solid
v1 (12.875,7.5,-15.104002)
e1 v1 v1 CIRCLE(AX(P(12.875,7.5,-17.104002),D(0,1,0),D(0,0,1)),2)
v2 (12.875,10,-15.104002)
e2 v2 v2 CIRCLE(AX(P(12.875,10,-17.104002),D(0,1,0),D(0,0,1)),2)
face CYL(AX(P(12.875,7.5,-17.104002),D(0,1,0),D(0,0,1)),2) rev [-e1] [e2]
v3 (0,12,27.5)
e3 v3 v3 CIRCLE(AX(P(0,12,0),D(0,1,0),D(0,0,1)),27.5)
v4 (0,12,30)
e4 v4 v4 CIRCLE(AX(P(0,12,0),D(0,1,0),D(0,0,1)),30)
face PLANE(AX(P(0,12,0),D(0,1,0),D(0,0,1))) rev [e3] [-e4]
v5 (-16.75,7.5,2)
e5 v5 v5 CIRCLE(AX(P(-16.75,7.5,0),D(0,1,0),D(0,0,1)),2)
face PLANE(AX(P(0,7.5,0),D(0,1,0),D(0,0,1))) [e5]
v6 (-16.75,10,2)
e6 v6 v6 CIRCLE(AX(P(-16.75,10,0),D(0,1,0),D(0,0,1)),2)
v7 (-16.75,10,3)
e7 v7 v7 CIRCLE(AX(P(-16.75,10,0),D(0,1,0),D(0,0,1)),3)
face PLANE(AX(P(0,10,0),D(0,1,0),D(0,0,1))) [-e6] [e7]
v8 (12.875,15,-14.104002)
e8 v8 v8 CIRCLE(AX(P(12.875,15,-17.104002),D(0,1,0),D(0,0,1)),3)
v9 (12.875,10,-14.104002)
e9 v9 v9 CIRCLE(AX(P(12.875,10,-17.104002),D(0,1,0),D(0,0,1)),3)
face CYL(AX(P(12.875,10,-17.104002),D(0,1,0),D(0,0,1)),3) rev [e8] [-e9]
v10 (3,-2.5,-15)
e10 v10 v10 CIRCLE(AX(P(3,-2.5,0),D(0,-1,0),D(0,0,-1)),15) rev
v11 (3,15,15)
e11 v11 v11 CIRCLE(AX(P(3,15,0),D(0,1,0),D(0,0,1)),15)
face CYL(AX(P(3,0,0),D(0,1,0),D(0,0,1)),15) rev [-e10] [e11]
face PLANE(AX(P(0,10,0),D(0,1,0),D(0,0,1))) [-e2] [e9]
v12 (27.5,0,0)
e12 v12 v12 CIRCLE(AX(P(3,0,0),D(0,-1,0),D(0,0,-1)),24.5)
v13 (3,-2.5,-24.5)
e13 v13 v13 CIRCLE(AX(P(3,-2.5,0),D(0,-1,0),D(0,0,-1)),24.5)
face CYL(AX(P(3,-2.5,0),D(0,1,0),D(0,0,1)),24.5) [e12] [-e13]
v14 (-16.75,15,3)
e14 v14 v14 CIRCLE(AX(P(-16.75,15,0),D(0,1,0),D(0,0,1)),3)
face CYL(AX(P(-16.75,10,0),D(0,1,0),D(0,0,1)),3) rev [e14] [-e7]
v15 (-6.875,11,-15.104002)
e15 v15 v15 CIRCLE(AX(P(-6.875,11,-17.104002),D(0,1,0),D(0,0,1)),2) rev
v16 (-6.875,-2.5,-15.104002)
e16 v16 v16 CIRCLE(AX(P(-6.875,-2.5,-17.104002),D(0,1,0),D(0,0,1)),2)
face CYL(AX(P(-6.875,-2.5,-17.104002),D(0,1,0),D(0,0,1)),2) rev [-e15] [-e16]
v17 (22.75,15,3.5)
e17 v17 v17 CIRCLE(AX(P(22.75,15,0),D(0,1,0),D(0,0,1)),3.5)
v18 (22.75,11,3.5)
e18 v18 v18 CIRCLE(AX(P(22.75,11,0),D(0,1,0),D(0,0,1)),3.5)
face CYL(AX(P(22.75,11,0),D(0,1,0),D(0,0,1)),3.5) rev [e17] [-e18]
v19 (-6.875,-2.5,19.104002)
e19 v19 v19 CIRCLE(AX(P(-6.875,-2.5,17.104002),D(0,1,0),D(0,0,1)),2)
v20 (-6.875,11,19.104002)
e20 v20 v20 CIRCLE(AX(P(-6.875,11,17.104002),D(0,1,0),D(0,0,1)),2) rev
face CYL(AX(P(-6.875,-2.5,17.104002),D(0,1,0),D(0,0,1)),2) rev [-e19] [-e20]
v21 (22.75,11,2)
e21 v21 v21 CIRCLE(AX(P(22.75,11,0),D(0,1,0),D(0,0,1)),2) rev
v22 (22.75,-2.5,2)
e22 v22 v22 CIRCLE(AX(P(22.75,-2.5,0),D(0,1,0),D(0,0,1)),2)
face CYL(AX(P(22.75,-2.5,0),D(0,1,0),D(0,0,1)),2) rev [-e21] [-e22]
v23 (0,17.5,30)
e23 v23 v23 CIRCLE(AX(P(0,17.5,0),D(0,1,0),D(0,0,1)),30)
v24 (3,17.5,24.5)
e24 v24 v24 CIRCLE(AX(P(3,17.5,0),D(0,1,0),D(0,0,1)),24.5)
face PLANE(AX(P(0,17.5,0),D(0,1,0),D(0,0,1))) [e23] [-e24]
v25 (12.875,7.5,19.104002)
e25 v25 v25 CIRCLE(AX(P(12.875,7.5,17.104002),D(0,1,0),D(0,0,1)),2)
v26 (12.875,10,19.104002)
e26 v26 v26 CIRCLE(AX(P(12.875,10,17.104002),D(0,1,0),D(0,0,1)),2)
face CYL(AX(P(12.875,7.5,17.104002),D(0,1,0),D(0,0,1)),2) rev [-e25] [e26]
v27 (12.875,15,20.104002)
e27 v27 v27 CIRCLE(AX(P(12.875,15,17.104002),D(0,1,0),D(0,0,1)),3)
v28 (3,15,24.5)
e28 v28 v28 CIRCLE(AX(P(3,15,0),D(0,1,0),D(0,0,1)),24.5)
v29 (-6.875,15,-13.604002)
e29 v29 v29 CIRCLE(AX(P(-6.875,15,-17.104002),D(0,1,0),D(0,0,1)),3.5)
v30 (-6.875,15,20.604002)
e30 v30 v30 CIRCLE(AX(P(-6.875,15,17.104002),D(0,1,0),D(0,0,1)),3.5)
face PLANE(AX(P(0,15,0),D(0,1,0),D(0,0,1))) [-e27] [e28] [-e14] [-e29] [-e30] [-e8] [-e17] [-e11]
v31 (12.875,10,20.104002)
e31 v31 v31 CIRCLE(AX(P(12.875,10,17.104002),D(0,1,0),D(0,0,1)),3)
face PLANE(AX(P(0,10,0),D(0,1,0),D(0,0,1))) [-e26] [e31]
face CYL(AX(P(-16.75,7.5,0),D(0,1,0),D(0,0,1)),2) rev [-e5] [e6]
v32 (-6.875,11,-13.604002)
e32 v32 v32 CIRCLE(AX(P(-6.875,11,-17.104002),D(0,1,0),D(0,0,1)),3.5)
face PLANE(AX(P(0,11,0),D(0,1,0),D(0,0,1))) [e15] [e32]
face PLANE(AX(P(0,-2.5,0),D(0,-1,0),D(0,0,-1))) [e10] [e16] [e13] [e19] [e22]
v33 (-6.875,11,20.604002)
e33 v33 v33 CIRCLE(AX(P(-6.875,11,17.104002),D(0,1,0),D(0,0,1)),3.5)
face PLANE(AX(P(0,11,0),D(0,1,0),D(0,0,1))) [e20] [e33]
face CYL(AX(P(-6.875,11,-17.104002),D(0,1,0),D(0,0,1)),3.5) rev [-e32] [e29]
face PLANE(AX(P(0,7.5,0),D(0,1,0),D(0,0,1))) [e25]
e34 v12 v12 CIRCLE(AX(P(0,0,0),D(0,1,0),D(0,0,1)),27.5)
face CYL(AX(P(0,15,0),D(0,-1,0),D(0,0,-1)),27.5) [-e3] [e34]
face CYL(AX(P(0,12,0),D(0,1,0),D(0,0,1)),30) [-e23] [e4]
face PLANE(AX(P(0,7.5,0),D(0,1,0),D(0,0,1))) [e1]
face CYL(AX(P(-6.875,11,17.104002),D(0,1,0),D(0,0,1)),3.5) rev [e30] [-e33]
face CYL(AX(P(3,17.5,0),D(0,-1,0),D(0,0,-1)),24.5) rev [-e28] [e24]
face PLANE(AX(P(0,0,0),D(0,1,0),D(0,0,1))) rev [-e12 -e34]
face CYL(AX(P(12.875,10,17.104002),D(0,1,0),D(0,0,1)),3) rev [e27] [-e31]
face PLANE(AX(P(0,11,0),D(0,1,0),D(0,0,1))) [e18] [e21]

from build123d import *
from build123d.topology import SkipClean

# Parameters (mm, degrees)
SKETCH1_R            = 27.5
BOSS_EXTRUDE1_DEPTH  = 15
BOSS_EXTRUDE3_DEPTH  = 2.5
FILLET2_R            = 1.5
SKETCH4_R            = 3
CUT_EXTRUDE1_DEPTH   = 5
SKETCH5_R            = 15
CUT_EXTRUDE2_DEPTH   = 15
SKETCH7_R            = 24.5
SKETCH7_R_2          = 15
BOSS_EXTRUDE6_DEPTH  = 2.5
SKETCH8_R            = 2
CUT_EXTRUDE3_DEPTH   = 17.5
SKETCH9_R            = 3.5
SKETCH9_R_2          = 2
CUT_EXTRUDE4_DEPTH   = 4
SKETCH10_R           = 2
CUT_EXTRUDE5_DEPTH   = 2.5
SKETCH14_R           = 30
SKETCH14_R_2         = 24.5
BOSS_EXTRUDE14_DEPTH = 5.5


with BuildPart() as part:
    # Sketch1 → Boss-Extrude1 (new body)
    with BuildSketch(Plane(origin=(0, 0, 0), x_dir=(1, 0, 0), z_dir=(0, 1, 0))):
        Circle(SKETCH1_R)
    extrude(amount=BOSS_EXTRUDE1_DEPTH)

    # Sketch3 → Boss-Extrude3 (add)
    with BuildSketch(Plane(origin=(0, 15, 0), x_dir=(1, 0, 0), z_dir=(0, 1, 0))):
        with BuildLine():
            ThreePointArc((0, -24.315632832), (-21.5, 0), (0, 24.315632832))
            Line((0, 24.315632832), (0, 27.5))
            ThreePointArc((0, 27.5), (-27.5, 0), (0, -27.5))
            Line((0, -27.5), (0, -24.315632832))
        make_face()
    extrude(amount=BOSS_EXTRUDE3_DEPTH)

    # Fillet2
    fillet2_edges = [part.edges().sort_by_distance(p)[0] for p in [
        (0, 16.25, -27.5),
        (0, 16.25, -24.315632832),
        (0, 16.25, 24.315632832),
        (0, 16.25, 27.5),
    ]]
    fillet(fillet2_edges, radius=FILLET2_R)

    # Sketch4 → Cut-Extrude1 (cut)
    with BuildSketch(Plane(origin=(0, 15, 0), x_dir=(1, 0, 0), z_dir=(0, 1, 0))):
        with Locations((-16.75, 0)):
            Circle(SKETCH4_R)
        with Locations((12.875, 17.104001725)):
            Circle(SKETCH4_R)
        with Locations((12.875, -17.104001725)):
            Circle(SKETCH4_R)
    extrude(amount=-CUT_EXTRUDE1_DEPTH, mode=Mode.SUBTRACT)

    # Sketch5 → Cut-Extrude2 (cut)
    with BuildSketch(Plane(origin=(0, 15, 0), x_dir=(1, 0, 0), z_dir=(0, 1, 0))):
        with Locations((3, 0)):
            Circle(SKETCH5_R)
    extrude(amount=-CUT_EXTRUDE2_DEPTH, mode=Mode.SUBTRACT)

    # Sketch7 → Boss-Extrude6 (add)
    with BuildSketch(Plane.XZ):
        with Locations((3, 0)):
            Circle(SKETCH7_R)
        with Locations((3, 0)):
            Circle(SKETCH7_R_2, mode=Mode.SUBTRACT)
    extrude(amount=BOSS_EXTRUDE6_DEPTH)

    # Sketch8 → Cut-Extrude3 (cut)
    with BuildSketch(Plane(origin=(0, 15, 0), x_dir=(1, 0, 0), z_dir=(0, 1, 0))):
        with Locations((-6.875, 17.104001725)):
            Circle(SKETCH8_R)
        with Locations((22.75, 0)):
            Circle(SKETCH8_R)
        with Locations((-6.875, -17.104001725)):
            Circle(SKETCH8_R)
    extrude(amount=-CUT_EXTRUDE3_DEPTH, mode=Mode.SUBTRACT)

    # Sketch9 → Cut-Extrude4 (cut)
    # profile 1 of 3: a face of its own
    with BuildSketch(Plane(origin=(0, 15, 0), x_dir=(1, 0, 0), z_dir=(0, 1, 0))):
        with Locations((-6.875, 17.104001725)):
            Circle(SKETCH9_R)
        with Locations((-6.875, 17.104001725)):
            Circle(SKETCH9_R_2, mode=Mode.SUBTRACT)
    # profile 2 of 3: a face of its own
    with BuildSketch(Plane(origin=(0, 15, 0), x_dir=(1, 0, 0), z_dir=(0, 1, 0))):
        with Locations((22.75, 0)):
            Circle(SKETCH9_R)
        with Locations((22.75, 0)):
            Circle(SKETCH9_R_2, mode=Mode.SUBTRACT)
    # profile 3 of 3: a face of its own
    with BuildSketch(Plane(origin=(0, 15, 0), x_dir=(1, 0, 0), z_dir=(0, 1, 0))):
        with Locations((-6.875, -17.104001725)):
            Circle(SKETCH9_R)
        with Locations((-6.875, -17.104001725)):
            Circle(SKETCH9_R_2, mode=Mode.SUBTRACT)
    extrude(amount=-CUT_EXTRUDE4_DEPTH, mode=Mode.SUBTRACT)

    # Sketch10 → Cut-Extrude5 (cut)
    with BuildSketch(Plane(origin=(0, 10, 0), x_dir=(1, 0, 0), z_dir=(0, 1, 0))):
        with Locations((-16.75, 0)):
            Circle(SKETCH10_R)
        with Locations((12.875, 17.104001725)):
            Circle(SKETCH10_R)
        with Locations((12.875, -17.104001725)):
            Circle(SKETCH10_R)
    extrude(amount=-CUT_EXTRUDE5_DEPTH, mode=Mode.SUBTRACT)

    # Sketch14 → Boss-Extrude14 (add)
    with SkipClean():  # the faces are left unmerged after this step: merging them gives an invalid solid
        with BuildSketch(Plane(origin=(0, 17.5, 0), x_dir=(1, 0, 0), z_dir=(0, 1, 0))):
            Circle(SKETCH14_R)
            with Locations((3, 0)):
                Circle(SKETCH14_R_2, mode=Mode.SUBTRACT)
        extrude(amount=-BOSS_EXTRUDE14_DEPTH)


solid = part.part
